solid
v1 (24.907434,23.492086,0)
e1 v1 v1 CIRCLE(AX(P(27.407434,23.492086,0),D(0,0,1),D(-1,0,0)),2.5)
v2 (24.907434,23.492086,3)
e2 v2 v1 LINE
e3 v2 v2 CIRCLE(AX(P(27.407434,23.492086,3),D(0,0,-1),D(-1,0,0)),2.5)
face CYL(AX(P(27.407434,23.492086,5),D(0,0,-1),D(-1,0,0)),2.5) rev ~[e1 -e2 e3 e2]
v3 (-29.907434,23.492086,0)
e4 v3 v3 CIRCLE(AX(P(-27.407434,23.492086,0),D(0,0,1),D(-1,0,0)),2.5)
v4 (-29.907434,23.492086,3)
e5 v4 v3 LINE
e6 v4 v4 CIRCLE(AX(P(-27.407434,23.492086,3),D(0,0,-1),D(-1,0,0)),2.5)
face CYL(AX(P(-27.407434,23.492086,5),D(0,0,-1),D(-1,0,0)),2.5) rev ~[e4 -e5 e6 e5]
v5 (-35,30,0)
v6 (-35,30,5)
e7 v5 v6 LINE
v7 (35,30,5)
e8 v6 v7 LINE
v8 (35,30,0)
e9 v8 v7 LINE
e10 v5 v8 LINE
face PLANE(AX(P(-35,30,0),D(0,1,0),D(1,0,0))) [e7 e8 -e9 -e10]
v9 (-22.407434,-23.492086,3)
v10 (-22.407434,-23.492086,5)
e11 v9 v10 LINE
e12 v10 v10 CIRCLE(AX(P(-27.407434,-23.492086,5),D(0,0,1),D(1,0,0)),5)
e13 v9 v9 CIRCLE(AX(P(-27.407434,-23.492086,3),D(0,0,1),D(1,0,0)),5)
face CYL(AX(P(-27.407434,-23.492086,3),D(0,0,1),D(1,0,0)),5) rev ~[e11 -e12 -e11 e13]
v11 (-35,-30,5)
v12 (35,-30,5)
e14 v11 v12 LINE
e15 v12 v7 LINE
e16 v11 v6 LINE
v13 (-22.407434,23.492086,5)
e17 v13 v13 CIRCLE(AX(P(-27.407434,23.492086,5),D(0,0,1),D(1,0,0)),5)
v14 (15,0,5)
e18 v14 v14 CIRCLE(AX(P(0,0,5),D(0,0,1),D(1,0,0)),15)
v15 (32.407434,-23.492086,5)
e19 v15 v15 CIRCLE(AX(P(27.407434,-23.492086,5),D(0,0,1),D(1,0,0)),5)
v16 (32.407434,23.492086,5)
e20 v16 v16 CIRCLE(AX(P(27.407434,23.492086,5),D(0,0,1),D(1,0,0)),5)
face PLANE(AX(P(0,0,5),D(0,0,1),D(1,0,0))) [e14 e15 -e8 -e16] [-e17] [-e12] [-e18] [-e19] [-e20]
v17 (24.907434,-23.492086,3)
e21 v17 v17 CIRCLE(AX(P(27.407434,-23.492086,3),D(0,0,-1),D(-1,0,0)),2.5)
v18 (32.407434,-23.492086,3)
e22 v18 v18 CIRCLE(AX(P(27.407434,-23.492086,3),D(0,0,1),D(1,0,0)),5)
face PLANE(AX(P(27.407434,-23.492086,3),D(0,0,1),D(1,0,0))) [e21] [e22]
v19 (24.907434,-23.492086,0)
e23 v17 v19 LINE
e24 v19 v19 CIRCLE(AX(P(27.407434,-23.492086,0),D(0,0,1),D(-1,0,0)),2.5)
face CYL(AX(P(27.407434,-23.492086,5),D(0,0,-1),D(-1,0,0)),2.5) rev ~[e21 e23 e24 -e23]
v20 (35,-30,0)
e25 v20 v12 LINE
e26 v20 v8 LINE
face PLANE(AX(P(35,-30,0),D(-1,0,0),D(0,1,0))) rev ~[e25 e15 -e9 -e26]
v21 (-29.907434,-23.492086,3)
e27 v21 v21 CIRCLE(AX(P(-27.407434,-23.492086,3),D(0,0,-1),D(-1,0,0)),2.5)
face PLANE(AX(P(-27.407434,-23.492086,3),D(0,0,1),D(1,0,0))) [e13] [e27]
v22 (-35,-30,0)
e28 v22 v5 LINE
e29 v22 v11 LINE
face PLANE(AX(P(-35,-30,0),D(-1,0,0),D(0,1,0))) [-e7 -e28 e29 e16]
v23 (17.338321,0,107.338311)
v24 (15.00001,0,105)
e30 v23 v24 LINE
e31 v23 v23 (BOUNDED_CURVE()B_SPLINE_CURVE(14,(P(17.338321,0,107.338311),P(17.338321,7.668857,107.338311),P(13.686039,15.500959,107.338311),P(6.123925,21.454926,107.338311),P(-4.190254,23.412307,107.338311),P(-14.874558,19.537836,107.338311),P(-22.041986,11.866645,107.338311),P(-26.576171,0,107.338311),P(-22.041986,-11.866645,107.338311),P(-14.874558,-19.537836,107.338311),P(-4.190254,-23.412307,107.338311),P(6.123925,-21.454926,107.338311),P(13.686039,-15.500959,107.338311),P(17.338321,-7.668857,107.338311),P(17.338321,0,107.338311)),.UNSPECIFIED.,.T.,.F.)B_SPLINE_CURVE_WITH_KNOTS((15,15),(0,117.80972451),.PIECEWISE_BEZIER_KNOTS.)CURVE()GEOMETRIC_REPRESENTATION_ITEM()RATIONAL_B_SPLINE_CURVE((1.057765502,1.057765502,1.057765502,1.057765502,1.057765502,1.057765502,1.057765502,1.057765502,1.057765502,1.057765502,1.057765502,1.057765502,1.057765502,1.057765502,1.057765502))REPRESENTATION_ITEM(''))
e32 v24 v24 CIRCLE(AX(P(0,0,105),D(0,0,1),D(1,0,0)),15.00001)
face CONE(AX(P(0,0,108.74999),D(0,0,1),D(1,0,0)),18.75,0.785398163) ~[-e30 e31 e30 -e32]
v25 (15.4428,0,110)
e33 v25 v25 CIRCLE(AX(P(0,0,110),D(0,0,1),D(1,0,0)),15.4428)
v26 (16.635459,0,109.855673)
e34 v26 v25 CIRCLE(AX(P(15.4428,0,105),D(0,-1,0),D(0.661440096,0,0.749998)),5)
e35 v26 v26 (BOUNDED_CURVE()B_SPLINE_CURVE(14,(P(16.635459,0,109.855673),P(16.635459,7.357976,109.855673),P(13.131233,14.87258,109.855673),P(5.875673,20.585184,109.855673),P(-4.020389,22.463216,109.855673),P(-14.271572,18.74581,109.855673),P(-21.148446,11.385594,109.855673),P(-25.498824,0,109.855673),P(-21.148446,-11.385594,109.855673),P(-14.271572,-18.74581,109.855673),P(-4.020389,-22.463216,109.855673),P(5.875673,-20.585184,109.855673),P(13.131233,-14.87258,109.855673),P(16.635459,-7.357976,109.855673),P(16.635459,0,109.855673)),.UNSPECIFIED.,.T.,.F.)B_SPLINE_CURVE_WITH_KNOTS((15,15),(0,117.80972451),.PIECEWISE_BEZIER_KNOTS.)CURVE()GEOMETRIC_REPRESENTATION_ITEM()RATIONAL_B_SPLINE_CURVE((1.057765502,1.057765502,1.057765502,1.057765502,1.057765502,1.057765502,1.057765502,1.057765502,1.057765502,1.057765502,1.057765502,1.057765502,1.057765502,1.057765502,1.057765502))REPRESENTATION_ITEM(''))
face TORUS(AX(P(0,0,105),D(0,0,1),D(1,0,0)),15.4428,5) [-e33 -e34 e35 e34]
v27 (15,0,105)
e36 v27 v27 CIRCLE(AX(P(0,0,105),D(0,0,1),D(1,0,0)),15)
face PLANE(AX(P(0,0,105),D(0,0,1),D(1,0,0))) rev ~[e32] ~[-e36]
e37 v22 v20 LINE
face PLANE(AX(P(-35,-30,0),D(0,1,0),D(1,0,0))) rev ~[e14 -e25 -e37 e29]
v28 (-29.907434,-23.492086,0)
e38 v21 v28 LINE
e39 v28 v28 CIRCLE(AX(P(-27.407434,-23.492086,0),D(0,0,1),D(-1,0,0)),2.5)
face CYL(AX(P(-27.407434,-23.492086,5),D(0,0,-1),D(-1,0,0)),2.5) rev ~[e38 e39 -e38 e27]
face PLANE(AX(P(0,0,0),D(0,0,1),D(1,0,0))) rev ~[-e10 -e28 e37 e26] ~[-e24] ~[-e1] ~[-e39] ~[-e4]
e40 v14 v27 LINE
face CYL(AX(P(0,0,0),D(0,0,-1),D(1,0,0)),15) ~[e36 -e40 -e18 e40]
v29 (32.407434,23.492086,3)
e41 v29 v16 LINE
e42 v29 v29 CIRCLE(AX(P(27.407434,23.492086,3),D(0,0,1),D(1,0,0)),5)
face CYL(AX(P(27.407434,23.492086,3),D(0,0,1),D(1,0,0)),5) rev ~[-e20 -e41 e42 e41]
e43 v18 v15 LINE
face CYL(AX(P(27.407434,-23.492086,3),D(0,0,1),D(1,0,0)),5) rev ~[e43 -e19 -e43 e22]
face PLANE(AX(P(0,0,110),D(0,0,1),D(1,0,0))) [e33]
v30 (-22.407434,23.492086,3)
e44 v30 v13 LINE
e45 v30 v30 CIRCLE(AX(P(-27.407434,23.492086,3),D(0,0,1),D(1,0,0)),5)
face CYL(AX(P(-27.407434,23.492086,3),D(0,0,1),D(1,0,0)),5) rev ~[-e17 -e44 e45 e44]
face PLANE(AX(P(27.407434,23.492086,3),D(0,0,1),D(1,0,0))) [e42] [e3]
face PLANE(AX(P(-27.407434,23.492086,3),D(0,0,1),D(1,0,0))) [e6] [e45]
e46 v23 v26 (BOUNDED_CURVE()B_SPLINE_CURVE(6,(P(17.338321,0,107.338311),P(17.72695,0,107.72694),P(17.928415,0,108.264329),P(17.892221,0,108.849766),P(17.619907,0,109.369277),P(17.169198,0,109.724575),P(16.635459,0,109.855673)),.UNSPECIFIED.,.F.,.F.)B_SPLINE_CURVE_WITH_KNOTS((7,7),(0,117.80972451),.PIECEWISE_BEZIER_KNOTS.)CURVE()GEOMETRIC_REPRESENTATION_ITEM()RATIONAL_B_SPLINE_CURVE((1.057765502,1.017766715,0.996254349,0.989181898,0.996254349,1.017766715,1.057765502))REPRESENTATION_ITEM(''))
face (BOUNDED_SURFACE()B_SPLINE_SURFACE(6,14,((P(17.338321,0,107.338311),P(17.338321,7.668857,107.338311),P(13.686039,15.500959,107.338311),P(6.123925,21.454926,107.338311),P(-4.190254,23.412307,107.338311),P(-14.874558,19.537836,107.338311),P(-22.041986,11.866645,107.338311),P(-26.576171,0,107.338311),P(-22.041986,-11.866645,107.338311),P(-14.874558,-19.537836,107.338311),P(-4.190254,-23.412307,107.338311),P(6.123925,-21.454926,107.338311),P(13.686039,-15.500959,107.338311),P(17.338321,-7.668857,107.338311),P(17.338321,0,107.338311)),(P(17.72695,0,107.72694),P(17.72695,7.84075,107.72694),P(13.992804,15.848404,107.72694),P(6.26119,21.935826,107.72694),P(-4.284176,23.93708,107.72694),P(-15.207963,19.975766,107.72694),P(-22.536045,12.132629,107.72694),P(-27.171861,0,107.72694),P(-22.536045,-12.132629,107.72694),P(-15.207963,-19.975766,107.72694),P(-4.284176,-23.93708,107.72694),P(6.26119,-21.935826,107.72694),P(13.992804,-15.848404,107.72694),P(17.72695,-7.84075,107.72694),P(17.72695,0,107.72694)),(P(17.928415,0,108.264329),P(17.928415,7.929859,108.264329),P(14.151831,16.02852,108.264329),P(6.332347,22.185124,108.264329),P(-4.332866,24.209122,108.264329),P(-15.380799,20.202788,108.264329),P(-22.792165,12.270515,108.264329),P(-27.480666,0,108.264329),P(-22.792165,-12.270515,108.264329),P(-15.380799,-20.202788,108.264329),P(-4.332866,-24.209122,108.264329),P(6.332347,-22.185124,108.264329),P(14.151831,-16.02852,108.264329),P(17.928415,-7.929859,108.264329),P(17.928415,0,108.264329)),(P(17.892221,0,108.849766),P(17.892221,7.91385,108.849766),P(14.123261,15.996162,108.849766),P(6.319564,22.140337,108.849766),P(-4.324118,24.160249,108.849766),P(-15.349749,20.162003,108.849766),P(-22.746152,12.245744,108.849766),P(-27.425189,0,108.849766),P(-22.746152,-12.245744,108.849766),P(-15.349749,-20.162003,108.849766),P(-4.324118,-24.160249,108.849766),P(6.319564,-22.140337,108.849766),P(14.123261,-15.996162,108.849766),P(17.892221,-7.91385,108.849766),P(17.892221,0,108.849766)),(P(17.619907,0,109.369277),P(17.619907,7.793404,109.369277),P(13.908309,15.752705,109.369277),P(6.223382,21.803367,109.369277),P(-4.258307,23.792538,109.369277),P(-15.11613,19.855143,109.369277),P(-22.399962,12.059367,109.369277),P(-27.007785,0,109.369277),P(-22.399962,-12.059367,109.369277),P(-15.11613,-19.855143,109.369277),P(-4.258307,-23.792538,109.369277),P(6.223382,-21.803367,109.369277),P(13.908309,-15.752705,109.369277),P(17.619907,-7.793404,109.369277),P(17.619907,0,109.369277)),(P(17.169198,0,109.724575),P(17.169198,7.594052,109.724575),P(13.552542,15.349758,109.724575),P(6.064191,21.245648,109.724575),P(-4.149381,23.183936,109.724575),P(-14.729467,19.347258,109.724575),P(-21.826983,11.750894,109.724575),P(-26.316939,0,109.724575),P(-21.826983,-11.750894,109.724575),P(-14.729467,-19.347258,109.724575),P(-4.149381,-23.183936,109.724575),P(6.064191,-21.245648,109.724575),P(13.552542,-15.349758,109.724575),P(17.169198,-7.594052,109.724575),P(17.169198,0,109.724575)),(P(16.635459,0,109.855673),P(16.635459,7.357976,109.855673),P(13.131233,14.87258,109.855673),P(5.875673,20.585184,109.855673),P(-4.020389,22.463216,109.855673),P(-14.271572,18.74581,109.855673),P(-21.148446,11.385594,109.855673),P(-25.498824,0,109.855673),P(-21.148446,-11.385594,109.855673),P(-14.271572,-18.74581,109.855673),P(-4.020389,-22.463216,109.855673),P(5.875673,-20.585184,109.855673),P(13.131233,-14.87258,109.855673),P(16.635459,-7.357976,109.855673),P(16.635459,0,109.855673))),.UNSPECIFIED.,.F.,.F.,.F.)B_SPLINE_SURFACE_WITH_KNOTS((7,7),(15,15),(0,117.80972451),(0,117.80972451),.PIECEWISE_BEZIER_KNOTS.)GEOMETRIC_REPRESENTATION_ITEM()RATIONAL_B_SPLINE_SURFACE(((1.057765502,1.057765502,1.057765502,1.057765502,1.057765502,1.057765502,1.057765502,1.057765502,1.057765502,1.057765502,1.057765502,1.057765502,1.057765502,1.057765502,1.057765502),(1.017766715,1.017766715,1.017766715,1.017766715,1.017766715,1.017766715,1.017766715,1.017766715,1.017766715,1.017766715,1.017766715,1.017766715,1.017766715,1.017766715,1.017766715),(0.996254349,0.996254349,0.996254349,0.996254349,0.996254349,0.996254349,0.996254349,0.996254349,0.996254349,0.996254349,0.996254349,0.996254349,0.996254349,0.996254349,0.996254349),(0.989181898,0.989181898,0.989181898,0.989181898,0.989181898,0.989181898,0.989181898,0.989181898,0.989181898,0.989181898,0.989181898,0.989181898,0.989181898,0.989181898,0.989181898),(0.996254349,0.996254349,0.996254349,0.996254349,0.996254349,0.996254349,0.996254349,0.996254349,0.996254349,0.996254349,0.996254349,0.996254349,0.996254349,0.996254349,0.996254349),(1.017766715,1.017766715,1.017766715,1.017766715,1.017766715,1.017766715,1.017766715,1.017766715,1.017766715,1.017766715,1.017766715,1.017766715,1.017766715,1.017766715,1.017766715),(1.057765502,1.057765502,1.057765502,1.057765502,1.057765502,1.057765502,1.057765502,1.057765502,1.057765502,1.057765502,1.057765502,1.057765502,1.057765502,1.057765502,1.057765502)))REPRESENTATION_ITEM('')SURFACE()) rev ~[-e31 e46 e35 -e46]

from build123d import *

# Parameters (mm, degrees)
F0_W           = 70
F0_H           = 60
F0_R           = 15
F1_DEPTH       = 5
F2_DEPTH       = 105
F3_R           = 18.75
F3_R_2         = 15
F4_DEPTH       = 5
F5_SIZE        = 3.74999
F7_R           = 1.5
F9_D           = 5
F9_DEPTH       = 5
F9_CBORE_D     = 10
F9_CBORE_DEPTH = 2
F9_TIP         = 1.5021515476


# Not quite as in the source:
# - a fillet or chamfer that OpenCascade refuses, or shapes differently, is made with other operations: its cross-section is extruded or revolved along the edge and cut away or added
# - a fillet or chamfer is up to 0.001 mm smaller than in the source, because OpenCascade refuses the exact size


with BuildPart() as f1:
    # F0 (on Top) → F1 (new body)
    with BuildSketch(Plane.XY):
        Rectangle(F0_W, F0_H)
        Circle(F0_R, mode=Mode.SUBTRACT)
    extrude(amount=F1_DEPTH)

    # F0 (on Top) → F2 (join)
    with BuildSketch(Plane.XY):
        Circle(F0_R)
    extrude(amount=F2_DEPTH)

    # F3 (on face) → F4 (join)
    with BuildSketch(Plane.XY.offset(105)):
        Circle(F3_R)
        Circle(F3_R_2, mode=Mode.SUBTRACT)
        Circle(F3_R_2)
    extrude(amount=F4_DEPTH)

    # F5 (size 3.75 in the source; OpenCascade refuses exactly that, so slightly less here)
    f5_edges = [f1.edges().sort_by_distance(p)[0] for p in [
        (-18.75, 0, 105),
    ]]
    chamfer(f5_edges, length=F5_SIZE)

    # F6: fillet of radius 5 on 1 edges, made by hand

    # F6_s1 → F6_t2 (revolve, cut)
    with BuildSketch(Plane.XZ):
        with BuildLine():
            ThreePointArc((18.75, 108.74999), (17.2105735463, 109.6770690609), (15.4427995223, 110))
            Line((15.4427995223, 110), (18.75, 110))
            Line((18.75, 110), (18.75, 108.74999))
        make_face()
    revolve(axis=Axis((0, 0, 110), (0, 0, 1)), mode=Mode.SUBTRACT)

    # F7
    f7_edges = [f1.edges().sort_by_distance(p)[0] for p in [
        (-18.75, 0, 108.74999),
    ]]
    fillet(f7_edges, radius=F7_R)

    # F9
    with Locations(Plane.XY.offset(5)):
        with Locations((-27.4074339763, 23.4920862654), (-27.4074339763, -23.4920862654), (27.4074339763, -23.4920862654), (27.4074339763, 23.4920862654)):
            CounterBoreHole(F9_D / 2, F9_CBORE_D / 2, F9_CBORE_DEPTH, depth=F9_DEPTH)
            with Locations((0, 0, -(F9_DEPTH + F9_TIP / 2))):  # 118° drill point
                Cone(0, F9_D / 2, F9_TIP, mode=Mode.SUBTRACT)


solid = f1.part
